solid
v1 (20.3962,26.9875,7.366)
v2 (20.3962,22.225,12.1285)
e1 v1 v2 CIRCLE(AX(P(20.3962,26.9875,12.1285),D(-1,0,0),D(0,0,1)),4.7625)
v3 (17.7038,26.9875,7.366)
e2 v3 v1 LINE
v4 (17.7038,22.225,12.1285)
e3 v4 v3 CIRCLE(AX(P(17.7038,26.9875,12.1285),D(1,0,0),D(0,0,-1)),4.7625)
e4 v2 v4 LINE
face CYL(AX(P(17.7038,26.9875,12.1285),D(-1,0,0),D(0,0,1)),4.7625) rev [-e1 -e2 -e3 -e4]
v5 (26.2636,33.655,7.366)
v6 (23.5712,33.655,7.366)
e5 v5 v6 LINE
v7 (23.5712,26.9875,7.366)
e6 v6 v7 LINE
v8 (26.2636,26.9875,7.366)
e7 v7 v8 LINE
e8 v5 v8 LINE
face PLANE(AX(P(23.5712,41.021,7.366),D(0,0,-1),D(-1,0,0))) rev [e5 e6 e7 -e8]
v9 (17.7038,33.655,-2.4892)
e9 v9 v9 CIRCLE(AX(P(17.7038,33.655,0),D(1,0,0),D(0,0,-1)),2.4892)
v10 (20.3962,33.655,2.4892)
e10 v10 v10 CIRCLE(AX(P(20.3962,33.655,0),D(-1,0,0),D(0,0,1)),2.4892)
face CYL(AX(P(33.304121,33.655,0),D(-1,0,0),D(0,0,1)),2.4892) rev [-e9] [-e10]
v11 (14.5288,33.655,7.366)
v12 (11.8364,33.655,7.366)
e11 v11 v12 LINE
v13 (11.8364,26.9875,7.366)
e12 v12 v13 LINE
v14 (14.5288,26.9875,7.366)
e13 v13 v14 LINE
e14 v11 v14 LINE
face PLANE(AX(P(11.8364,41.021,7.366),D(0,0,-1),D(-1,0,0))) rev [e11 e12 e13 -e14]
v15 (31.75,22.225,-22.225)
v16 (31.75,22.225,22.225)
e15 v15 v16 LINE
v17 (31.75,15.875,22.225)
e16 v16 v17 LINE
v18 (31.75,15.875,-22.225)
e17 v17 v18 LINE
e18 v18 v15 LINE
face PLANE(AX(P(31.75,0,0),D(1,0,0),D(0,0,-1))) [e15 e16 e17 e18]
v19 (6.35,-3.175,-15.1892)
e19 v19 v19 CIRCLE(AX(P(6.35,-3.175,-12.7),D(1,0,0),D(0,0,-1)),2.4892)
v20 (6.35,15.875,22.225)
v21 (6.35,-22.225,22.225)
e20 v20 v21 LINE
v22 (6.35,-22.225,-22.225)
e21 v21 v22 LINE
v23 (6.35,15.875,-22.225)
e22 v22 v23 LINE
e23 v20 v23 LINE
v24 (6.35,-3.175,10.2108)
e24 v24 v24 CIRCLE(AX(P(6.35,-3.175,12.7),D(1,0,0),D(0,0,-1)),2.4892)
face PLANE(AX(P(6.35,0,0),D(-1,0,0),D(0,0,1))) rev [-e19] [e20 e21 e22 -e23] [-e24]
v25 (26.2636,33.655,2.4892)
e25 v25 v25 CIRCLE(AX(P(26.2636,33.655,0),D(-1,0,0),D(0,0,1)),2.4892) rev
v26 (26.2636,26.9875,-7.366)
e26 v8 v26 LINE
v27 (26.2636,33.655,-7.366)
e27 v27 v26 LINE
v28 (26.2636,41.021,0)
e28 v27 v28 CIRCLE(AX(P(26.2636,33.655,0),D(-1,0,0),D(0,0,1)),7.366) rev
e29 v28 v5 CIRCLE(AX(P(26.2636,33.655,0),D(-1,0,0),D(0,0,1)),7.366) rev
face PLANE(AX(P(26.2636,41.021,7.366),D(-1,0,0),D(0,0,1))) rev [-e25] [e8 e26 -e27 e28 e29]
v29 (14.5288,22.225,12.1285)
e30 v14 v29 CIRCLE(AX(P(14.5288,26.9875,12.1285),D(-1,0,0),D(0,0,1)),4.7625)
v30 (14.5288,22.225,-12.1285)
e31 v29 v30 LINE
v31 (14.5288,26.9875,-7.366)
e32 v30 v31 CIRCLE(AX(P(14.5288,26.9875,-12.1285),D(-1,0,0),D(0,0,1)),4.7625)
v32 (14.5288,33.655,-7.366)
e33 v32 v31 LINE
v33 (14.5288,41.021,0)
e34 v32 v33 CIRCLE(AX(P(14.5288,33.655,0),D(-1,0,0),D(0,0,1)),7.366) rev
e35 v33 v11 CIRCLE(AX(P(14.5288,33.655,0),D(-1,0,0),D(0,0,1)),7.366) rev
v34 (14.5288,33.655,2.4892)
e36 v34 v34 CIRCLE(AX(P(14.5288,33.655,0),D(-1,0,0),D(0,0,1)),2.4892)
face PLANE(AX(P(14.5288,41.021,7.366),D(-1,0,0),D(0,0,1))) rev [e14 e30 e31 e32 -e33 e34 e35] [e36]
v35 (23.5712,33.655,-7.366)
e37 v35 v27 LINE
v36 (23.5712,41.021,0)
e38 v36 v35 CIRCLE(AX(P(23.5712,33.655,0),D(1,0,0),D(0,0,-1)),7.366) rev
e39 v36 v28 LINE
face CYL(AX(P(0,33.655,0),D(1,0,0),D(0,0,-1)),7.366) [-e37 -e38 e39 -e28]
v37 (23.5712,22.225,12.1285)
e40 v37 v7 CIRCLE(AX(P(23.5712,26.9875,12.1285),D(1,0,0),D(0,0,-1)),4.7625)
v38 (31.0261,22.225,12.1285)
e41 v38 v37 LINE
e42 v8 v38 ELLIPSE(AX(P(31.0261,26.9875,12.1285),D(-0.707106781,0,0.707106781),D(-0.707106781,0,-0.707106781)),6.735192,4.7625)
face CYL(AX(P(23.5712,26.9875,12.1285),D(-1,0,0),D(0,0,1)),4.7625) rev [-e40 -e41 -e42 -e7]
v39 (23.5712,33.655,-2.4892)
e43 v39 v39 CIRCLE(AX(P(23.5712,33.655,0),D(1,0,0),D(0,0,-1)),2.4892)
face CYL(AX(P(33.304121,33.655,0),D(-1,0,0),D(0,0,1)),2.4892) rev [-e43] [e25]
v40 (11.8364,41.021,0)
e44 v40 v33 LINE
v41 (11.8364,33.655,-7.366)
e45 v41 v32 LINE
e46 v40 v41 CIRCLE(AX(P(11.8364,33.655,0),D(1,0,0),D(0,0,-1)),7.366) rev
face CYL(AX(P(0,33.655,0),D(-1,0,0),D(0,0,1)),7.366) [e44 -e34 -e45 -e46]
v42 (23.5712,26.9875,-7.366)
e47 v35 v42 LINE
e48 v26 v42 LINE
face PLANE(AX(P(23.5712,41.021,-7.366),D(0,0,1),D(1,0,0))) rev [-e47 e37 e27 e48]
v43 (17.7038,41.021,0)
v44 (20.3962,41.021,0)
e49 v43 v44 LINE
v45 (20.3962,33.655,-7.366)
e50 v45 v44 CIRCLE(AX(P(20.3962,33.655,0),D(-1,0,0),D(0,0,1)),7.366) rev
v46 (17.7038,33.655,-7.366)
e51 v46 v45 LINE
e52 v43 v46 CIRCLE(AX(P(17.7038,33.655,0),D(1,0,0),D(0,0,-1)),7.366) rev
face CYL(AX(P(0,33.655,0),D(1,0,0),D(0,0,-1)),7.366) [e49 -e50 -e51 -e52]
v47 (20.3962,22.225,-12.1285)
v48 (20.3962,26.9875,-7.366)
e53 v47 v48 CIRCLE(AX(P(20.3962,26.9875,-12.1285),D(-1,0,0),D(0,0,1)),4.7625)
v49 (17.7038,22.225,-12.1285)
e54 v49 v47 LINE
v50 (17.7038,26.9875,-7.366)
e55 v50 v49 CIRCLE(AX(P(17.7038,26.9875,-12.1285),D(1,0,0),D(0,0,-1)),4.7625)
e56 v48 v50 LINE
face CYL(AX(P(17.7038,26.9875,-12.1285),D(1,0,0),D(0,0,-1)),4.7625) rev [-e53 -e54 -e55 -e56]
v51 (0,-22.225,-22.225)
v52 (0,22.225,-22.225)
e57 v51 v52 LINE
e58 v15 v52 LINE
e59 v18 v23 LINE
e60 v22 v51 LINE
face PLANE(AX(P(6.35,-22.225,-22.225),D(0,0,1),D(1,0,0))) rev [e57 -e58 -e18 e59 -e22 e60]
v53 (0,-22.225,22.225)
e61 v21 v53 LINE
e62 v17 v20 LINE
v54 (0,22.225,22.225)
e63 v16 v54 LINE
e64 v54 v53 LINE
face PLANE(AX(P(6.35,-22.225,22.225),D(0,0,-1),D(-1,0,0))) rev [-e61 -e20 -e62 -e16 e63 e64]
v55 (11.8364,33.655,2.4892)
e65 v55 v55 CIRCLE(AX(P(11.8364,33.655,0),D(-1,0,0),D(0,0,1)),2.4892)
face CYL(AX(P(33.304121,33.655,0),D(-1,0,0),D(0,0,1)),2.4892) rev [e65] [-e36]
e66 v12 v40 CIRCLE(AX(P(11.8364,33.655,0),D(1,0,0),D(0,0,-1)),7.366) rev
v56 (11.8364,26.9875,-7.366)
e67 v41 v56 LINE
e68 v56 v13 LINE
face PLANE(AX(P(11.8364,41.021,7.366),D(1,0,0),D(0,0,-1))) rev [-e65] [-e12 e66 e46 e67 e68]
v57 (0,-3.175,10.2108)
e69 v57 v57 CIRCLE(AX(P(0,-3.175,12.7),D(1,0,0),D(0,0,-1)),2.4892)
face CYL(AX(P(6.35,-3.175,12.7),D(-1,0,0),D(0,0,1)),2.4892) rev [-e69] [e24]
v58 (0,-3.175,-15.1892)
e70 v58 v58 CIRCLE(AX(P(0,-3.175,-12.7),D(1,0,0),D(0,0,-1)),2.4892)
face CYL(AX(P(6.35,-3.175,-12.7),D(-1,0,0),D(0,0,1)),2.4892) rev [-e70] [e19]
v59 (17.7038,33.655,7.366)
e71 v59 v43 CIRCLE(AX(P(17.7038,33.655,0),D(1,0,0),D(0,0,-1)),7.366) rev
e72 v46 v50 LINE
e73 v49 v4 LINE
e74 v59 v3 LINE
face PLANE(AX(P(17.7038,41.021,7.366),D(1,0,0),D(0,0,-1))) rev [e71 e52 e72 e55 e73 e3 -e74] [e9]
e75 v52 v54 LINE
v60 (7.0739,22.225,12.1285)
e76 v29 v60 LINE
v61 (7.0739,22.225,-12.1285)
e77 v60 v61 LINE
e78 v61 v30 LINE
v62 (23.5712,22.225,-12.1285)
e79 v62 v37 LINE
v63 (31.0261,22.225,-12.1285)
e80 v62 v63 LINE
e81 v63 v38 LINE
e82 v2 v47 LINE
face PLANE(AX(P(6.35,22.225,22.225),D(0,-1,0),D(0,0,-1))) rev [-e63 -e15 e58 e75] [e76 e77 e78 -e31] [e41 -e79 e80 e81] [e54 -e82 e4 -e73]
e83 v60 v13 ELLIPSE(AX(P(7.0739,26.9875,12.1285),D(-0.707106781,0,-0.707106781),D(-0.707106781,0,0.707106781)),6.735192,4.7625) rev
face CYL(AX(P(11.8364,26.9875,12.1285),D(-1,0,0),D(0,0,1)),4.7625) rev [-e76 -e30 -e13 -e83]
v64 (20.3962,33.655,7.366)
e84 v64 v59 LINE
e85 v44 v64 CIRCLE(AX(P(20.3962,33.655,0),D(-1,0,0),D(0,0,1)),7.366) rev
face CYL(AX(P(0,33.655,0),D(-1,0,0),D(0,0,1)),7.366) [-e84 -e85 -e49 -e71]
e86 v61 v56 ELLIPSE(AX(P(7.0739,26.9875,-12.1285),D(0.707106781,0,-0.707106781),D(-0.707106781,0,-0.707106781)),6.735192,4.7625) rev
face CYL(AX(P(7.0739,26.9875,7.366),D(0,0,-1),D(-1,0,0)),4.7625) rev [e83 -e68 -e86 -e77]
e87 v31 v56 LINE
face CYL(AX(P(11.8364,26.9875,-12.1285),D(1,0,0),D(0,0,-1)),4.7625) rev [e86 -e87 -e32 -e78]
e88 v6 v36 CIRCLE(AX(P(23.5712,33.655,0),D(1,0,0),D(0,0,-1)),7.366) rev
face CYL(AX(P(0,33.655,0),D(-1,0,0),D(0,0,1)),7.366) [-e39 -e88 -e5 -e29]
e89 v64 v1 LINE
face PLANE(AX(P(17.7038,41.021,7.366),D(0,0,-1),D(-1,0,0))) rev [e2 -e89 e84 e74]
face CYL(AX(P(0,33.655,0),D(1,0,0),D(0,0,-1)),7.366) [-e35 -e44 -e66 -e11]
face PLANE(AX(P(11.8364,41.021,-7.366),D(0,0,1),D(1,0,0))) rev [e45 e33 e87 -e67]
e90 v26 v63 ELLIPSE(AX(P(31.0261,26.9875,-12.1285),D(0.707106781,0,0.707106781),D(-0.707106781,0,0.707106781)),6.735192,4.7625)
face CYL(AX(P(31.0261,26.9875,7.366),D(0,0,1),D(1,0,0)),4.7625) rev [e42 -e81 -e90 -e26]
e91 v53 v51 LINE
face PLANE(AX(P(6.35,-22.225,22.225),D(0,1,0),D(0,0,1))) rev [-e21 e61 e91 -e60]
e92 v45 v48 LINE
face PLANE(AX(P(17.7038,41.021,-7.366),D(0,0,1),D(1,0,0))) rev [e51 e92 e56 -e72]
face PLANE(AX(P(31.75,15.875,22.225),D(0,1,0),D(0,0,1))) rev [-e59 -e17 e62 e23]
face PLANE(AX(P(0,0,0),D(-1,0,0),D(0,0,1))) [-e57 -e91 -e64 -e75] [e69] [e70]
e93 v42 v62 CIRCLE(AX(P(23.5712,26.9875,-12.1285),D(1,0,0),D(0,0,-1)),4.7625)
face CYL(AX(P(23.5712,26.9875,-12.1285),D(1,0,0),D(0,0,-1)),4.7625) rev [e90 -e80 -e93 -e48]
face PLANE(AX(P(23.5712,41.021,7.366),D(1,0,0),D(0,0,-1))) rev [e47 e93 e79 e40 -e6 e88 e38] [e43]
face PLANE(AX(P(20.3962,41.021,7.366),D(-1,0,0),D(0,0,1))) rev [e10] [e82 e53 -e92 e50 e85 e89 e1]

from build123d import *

# Parameters (mm, degrees)
SKETCH1_W           = 44.45
SKETCH1_H           = 44.45
SKETCH1_R           = 2.4892
BOSS_EXTRUDE1_DEPTH = 6.35
SKETCH2_W           = 44.45
SKETCH2_H           = 6.35
BOSS_EXTRUDE2_DEPTH = 25.4
SKETCH3_W           = 2.6924
SKETCH3_H           = 14.732
BOSS_EXTRUDE3_DEPTH = 18.796
FILLET3_R           = 7.366
CUT_EXTRUDE1_REACH  = 52.727
SKETCH4_R           = 2.4892
FILLET4_R           = 4.7625


with BuildPart() as part:
    # Sketch1 → Boss-Extrude1 (new body)
    with BuildSketch(Plane(origin=(0, 0, 0), x_dir=(0, 0, -1), z_dir=(1, 0, 0))):
        Rectangle(SKETCH1_W, SKETCH1_H)
        with Locations((-12.7, -3.175)):
            Circle(SKETCH1_R, mode=Mode.SUBTRACT)
        with Locations((12.7, -3.175)):
            Circle(SKETCH1_R, mode=Mode.SUBTRACT)
    extrude(amount=BOSS_EXTRUDE1_DEPTH)

    # Sketch2 → Boss-Extrude2 (add)
    with BuildSketch(Plane(origin=(6.35, 0, 0), x_dir=(0, 0, -1), z_dir=(1, 0, 0))):
        with Locations((0, 19.05)):
            Rectangle(SKETCH2_W, SKETCH2_H)
    extrude(amount=BOSS_EXTRUDE2_DEPTH)

    # Sketch3 → Boss-Extrude3 (add)
    with BuildSketch(Plane(origin=(0, 22.225, 0), x_dir=(1, 0, 0), z_dir=(0, 1, 0))):
        with Locations((13.1826, 0)):
            Rectangle(SKETCH3_W, SKETCH3_H)
        with Locations((19.05, 0)):
            Rectangle(SKETCH3_W, SKETCH3_H)
        with Locations((24.9174, 0)):
            Rectangle(SKETCH3_W, SKETCH3_H)
    extrude(amount=BOSS_EXTRUDE3_DEPTH)

    # Fillet3
    fillet3_edges = [part.edges().sort_by_distance(p)[0] for p in [
        (19.05, 41.021, -7.366),
        (13.1826, 41.021, -7.366),
        (24.9174, 41.021, 7.366),
        (19.05, 41.021, 7.366),
        (13.1826, 41.021, 7.366),
        (24.9174, 41.021, -7.366),
    ]]
    fillet(fillet3_edges, radius=FILLET3_R - 0.0001)  # a hair under: the kernel refuses the full size

    # Cut-Extrude1: up to this face of the body (flat: up to its plane)
    cut_extrude1_end = Plane(part.part.faces().sort_by_distance((26.2636, 30.911144625, 0))[0])
    # Sketch4 → Cut-Extrude1 (cut, up to the picked face)
    with BuildSketch(Plane.ZY.offset(-11.8364), mode=Mode.PRIVATE) as cut_extrude1_sk1:
        with Locations((0, 33.655)):
            Circle(SKETCH4_R)
    cut_extrude1_tool1 = split(extrude(cut_extrude1_sk1.sketch, amount=-CUT_EXTRUDE1_REACH, mode=Mode.PRIVATE), bisect_by=cut_extrude1_end, keep=Keep.BOTH, mode=Mode.PRIVATE)
    add(cut_extrude1_tool1.solids().sort_by(Axis((11.8364, 33.655, 0), (1, 0, 0)))[0], mode=Mode.SUBTRACT)

    # Fillet4
    fillet4_edges = [part.edges().sort_by_distance(p)[0] for p in [
        (13.1826, 22.225, -7.366),
        (11.8364, 22.225, 0),
        (13.1826, 22.225, 7.366),
        (19.05, 22.225, -7.366),
        (19.05, 22.225, 7.366),
        (24.9174, 22.225, -7.366),
        (24.9174, 22.225, 7.366),
        (26.2636, 22.225, 0),
    ]]
    fillet(fillet4_edges, radius=FILLET4_R)


solid = part.part
